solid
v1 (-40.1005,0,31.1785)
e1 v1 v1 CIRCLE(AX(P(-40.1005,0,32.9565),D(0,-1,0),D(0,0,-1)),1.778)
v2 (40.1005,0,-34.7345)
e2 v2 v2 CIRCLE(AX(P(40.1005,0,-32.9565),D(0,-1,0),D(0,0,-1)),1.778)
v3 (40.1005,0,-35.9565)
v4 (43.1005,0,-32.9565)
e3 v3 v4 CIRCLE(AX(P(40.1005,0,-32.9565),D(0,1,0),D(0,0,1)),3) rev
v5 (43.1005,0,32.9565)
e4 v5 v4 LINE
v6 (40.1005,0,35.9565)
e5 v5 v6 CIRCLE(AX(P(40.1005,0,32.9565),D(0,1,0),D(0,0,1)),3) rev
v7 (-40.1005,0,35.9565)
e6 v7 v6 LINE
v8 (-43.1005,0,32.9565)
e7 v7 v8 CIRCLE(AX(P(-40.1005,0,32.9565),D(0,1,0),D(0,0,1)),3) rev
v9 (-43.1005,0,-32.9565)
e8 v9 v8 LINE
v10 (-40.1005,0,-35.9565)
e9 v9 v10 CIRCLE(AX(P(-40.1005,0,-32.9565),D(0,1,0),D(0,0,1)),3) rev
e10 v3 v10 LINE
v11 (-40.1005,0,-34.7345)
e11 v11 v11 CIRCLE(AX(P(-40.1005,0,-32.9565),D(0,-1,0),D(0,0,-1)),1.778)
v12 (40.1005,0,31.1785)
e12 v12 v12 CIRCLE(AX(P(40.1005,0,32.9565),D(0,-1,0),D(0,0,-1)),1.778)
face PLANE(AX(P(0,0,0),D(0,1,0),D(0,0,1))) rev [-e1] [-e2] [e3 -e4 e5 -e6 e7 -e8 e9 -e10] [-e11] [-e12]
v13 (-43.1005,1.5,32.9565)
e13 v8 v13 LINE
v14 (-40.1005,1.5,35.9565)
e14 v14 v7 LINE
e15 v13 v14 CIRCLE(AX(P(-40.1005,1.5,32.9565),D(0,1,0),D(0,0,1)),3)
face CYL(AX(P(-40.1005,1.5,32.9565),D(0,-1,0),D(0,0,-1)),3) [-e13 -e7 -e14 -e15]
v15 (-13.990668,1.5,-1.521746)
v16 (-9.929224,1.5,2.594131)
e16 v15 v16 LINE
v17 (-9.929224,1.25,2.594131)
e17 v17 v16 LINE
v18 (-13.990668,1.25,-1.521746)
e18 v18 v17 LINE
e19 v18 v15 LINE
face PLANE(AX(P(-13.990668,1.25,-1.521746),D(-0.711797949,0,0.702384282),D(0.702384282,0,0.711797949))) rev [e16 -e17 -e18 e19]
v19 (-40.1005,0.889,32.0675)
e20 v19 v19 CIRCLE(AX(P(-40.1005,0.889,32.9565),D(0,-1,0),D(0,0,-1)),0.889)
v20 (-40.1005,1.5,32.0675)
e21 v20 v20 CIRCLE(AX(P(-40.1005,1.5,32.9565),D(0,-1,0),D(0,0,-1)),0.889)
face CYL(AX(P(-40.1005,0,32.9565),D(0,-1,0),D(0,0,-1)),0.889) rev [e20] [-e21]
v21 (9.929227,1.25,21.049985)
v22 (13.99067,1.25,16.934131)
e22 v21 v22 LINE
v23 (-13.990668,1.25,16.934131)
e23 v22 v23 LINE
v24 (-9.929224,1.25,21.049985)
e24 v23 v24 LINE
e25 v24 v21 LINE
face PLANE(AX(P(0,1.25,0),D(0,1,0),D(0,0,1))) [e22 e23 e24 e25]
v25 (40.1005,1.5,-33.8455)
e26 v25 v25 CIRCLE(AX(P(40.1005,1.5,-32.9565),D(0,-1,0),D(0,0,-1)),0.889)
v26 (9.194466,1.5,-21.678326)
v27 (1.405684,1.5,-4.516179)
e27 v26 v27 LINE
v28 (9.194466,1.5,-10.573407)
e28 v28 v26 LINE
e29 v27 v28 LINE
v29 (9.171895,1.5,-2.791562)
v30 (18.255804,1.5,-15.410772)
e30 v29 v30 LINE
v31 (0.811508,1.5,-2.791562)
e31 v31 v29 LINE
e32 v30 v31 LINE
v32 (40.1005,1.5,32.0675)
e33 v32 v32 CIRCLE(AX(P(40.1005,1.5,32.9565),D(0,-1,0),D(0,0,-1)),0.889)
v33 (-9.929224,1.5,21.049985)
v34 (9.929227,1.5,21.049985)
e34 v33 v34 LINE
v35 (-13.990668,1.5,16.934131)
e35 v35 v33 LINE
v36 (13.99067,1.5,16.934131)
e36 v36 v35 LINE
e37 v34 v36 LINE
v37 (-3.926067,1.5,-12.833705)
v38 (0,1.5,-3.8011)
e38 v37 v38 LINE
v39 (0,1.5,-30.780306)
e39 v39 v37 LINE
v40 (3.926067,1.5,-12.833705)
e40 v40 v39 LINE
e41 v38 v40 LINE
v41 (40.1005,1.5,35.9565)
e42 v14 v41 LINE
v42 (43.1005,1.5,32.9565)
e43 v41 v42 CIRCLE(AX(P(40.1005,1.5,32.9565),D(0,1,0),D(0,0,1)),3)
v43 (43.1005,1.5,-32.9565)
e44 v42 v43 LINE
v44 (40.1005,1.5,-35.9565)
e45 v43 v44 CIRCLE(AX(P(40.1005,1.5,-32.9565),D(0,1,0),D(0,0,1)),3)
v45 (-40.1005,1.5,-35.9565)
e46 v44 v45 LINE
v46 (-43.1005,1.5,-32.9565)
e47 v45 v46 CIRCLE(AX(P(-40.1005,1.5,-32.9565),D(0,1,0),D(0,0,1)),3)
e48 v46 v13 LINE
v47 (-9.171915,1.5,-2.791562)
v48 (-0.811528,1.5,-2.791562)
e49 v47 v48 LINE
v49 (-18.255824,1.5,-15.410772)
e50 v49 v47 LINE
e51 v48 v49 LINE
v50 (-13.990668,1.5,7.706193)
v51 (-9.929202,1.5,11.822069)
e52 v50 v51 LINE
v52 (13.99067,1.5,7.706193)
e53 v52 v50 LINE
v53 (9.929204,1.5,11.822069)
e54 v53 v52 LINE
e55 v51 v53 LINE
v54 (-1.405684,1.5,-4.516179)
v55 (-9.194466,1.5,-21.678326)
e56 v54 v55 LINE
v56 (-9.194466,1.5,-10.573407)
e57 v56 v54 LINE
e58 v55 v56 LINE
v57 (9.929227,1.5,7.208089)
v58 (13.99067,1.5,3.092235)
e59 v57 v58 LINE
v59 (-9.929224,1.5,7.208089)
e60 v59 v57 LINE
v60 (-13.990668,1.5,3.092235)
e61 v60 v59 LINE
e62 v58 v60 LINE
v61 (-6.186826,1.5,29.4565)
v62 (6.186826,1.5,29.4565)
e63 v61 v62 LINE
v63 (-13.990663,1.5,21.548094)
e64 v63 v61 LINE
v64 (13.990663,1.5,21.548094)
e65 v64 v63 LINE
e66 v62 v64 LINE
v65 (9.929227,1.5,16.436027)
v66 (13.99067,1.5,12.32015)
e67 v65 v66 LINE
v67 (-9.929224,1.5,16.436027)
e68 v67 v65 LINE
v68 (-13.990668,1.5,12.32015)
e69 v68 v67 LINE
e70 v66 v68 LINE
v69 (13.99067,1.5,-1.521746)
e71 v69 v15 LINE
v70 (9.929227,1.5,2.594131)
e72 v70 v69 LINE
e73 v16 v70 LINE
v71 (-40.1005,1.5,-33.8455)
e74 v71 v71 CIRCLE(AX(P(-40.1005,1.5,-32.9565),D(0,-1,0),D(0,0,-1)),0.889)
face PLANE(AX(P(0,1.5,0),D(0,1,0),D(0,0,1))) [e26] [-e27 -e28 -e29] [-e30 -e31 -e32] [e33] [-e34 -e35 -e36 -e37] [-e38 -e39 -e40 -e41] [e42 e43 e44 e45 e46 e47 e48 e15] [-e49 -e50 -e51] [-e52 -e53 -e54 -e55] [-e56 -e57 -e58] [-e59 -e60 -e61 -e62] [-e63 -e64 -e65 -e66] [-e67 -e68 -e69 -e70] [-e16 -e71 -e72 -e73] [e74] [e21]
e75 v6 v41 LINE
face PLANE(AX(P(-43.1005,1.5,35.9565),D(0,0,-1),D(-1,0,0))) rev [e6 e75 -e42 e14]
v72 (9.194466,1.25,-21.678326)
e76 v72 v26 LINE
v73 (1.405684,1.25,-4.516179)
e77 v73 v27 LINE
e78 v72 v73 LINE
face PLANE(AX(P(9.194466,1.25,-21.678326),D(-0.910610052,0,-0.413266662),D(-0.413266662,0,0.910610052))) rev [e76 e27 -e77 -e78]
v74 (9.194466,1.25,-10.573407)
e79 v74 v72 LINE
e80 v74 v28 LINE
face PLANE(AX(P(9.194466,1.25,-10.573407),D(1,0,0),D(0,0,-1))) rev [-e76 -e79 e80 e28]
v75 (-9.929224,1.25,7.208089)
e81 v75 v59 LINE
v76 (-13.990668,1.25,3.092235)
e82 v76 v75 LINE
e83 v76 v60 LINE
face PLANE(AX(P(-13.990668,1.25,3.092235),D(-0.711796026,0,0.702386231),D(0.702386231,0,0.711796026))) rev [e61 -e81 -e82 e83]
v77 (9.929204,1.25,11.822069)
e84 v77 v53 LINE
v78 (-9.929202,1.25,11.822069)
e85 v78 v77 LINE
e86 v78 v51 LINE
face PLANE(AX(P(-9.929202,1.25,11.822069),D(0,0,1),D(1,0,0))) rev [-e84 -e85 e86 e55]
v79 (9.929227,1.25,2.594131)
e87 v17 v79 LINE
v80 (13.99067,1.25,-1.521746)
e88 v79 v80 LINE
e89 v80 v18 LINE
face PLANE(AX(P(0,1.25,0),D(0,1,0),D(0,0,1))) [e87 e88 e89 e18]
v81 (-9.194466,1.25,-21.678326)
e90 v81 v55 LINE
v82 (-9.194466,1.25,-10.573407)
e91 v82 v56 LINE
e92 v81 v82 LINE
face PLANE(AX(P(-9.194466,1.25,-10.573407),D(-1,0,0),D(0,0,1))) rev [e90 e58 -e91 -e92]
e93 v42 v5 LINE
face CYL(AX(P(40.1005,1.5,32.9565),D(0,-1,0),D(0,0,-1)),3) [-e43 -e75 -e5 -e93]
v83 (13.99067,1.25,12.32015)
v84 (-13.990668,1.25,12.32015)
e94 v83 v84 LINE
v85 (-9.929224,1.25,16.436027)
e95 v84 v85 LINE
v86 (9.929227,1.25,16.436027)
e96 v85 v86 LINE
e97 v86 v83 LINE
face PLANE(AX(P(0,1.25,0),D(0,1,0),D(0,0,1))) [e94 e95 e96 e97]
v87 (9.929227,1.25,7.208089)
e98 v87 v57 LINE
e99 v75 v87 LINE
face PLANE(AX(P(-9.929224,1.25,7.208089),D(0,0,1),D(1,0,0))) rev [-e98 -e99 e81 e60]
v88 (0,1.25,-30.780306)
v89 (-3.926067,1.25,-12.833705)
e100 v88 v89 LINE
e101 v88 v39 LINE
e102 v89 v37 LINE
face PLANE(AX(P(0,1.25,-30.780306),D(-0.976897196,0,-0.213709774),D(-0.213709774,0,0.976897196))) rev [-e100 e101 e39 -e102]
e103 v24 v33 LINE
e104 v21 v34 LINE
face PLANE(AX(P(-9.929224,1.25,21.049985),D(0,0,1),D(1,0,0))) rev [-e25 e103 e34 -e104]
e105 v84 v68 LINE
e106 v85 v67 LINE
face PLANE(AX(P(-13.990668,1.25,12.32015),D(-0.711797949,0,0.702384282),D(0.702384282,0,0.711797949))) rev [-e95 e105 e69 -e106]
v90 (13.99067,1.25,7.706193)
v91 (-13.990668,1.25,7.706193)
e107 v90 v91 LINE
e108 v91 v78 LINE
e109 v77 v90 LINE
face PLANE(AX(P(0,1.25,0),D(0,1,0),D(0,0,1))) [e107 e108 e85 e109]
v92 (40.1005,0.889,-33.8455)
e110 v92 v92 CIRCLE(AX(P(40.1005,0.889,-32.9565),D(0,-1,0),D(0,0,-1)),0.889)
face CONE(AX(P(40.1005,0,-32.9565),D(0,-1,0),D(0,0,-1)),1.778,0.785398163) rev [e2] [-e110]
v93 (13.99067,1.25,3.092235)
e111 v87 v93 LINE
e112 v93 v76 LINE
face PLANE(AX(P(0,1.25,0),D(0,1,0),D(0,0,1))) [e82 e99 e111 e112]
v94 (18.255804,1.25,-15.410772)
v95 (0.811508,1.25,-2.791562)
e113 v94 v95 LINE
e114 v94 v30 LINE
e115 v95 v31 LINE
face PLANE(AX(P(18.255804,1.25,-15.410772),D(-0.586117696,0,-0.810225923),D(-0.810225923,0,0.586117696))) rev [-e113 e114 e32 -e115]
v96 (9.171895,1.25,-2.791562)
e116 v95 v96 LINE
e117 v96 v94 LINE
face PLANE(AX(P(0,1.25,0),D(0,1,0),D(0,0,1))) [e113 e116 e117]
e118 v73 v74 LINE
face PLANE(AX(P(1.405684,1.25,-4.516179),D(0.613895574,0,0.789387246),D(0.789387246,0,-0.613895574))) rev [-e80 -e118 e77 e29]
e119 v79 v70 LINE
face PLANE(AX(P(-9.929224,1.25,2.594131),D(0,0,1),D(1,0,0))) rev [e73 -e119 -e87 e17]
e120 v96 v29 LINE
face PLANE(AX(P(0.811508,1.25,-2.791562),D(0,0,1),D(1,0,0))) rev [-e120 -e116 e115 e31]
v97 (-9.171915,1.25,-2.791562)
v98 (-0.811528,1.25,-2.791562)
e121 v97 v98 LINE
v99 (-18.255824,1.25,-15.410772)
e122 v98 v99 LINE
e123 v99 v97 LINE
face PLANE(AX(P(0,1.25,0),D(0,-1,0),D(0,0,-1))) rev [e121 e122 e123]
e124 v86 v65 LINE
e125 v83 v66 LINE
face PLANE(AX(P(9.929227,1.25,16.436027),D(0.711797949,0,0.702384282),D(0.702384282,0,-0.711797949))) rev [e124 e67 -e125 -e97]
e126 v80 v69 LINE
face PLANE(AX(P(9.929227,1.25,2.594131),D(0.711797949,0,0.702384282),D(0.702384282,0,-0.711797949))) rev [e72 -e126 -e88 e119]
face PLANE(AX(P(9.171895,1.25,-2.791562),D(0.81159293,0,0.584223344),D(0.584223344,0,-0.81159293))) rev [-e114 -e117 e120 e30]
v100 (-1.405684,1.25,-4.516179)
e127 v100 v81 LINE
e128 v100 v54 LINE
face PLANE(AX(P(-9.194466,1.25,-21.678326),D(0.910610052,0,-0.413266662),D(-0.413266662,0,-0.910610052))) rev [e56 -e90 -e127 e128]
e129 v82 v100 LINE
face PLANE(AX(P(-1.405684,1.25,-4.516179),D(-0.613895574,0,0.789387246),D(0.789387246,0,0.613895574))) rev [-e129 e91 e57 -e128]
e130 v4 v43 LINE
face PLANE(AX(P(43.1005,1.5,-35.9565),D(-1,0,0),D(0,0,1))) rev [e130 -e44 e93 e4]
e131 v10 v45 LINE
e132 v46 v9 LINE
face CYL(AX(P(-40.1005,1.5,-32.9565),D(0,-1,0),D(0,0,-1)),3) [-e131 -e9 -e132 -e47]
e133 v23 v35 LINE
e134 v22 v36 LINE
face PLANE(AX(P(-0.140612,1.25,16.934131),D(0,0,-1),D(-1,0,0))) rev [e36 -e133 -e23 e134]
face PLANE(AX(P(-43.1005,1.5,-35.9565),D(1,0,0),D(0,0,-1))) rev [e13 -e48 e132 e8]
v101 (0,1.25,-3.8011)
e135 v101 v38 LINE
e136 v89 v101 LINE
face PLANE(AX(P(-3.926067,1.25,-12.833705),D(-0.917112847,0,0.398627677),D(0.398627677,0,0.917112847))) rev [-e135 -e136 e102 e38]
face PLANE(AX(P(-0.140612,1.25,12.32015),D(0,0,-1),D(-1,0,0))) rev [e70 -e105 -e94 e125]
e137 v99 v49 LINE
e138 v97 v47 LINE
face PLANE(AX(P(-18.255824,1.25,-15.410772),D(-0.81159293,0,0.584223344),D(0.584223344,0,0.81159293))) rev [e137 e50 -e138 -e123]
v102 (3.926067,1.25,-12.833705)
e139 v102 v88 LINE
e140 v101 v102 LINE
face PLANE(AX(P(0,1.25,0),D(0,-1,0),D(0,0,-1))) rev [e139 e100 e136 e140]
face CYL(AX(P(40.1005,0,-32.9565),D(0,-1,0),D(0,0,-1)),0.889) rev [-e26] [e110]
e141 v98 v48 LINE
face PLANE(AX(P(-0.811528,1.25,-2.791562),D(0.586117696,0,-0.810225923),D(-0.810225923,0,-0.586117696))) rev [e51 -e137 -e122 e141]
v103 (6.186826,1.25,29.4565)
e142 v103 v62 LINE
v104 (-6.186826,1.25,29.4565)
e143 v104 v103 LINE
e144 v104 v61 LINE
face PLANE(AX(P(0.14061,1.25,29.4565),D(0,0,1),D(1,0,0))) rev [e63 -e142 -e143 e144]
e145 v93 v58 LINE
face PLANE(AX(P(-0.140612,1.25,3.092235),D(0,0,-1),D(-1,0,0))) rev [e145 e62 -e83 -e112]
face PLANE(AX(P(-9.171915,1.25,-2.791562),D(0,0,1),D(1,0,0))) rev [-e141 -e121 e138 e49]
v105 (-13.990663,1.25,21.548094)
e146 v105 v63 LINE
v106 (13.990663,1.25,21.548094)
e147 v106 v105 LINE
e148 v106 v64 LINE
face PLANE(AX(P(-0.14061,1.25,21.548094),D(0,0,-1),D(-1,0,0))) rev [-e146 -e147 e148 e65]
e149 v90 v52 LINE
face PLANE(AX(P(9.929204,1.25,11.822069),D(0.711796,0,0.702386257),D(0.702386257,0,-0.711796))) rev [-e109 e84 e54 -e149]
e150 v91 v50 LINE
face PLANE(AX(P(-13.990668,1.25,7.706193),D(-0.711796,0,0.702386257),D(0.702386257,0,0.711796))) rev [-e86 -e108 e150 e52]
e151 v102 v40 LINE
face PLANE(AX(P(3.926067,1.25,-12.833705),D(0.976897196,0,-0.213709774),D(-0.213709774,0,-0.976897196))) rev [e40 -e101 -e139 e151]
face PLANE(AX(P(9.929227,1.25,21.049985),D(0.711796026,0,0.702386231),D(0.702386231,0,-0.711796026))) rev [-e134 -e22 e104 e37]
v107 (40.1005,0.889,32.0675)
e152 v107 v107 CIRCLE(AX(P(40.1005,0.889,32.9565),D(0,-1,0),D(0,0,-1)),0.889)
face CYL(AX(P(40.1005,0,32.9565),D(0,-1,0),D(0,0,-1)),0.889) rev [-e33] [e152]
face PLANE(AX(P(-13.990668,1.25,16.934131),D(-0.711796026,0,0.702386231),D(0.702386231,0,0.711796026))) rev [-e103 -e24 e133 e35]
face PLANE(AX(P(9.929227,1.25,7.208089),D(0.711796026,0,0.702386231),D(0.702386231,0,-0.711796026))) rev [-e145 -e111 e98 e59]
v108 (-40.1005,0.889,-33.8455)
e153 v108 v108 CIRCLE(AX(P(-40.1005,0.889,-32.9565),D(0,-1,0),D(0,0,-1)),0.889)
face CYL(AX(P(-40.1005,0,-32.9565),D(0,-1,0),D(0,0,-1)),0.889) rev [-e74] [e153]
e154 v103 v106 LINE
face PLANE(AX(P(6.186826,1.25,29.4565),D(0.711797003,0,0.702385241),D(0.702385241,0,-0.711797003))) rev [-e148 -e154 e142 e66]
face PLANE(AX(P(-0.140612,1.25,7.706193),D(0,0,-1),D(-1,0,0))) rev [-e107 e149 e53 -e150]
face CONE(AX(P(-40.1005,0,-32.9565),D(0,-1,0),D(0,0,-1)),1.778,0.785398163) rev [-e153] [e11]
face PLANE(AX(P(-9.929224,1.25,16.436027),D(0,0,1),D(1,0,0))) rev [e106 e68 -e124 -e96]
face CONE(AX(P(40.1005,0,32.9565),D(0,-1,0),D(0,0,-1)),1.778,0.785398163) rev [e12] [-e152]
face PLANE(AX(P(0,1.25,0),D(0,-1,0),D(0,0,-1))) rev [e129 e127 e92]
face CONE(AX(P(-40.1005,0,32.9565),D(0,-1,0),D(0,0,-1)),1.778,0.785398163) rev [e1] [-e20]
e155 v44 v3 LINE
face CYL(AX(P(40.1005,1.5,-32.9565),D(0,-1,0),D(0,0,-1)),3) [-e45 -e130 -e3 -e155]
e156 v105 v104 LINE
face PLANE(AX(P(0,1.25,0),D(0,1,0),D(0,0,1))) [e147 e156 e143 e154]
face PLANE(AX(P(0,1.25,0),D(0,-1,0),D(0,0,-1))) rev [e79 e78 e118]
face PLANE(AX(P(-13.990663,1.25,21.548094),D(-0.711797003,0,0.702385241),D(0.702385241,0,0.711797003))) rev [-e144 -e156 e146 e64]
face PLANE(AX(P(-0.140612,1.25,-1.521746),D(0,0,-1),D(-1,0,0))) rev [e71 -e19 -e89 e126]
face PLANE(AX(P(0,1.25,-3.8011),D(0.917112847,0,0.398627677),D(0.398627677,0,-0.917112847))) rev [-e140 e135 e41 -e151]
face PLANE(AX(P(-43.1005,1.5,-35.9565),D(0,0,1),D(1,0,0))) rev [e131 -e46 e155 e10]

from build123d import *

# Parameters (mm, degrees)
SKETCH1_W                      = 86.201
SKETCH1_H                      = 71.913
BOSS_EXTRUDE1_DEPTH            = 1.5
FILLET1_R                      = 3
F_2_56_TAPPED_HOLE1_AT_2_COUNT = 2
F_2_56_TAPPED_HOLE1_AT_2_PITCH = 80.201
F_2_56_TAPPED_HOLE1_AT_3_COUNT = 2
F_2_56_TAPPED_HOLE1_AT_3_PITCH = 103.811001199
F_2_56_TAPPED_HOLE1_AT_4_COUNT = 2
F_2_56_TAPPED_HOLE1_AT_4_PITCH = 65.913
CUT_EXTRUDE1_START             = -0.25
CUT_EXTRUDE1_DEPTH             = 0.25


# Read off the part's stored shape, not the designer's step: Cut-Extrude1
with BuildPart() as part:
    # Sketch1 → Boss-Extrude1 (new body)
    with BuildSketch(Plane(origin=(0, 0, 0), x_dir=(1, 0, 0), z_dir=(0, 1, 0))):
        Rectangle(SKETCH1_W, SKETCH1_H)
    extrude(amount=BOSS_EXTRUDE1_DEPTH)

    # Fillet1
    fillet1_edges = [part.edges().sort_by_distance(p)[0] for p in [
        (43.1005, 0.75, 35.9565),
        (-43.1005, 0.75, 35.9565),
        (-43.1005, 0.75, -35.9565),
        (43.1005, 0.75, -35.9565),
    ]]
    fillet(fillet1_edges, radius=FILLET1_R)

    # Sketch4 → #2-56 Tapped Hole1 (revolve, cut)
    with BuildSketch(Plane(origin=(-40.1005, 0, 32.9565), x_dir=(0, 0, -1), z_dir=(1, 0, 0))):
        Polygon((0, 0), (0, 1.5), (0.889, 1.5), (0.889, 0.889), (1.778, 0), align=None)
    f_2_56_tapped_hole1 = revolve(axis=Axis((-40.1005, -6.35, 32.9565), (0, 1, 0)), mode=Mode.SUBTRACT)

    # #2-56 Tapped Hole1 at 2: #2-56 Tapped Hole1 ×2
    with Locations(*[(i * F_2_56_TAPPED_HOLE1_AT_2_PITCH, 0, 0) for i in range(1, F_2_56_TAPPED_HOLE1_AT_2_COUNT)]):
        add(f_2_56_tapped_hole1, mode=Mode.SUBTRACT)

    # #2-56 Tapped Hole1 at 3: #2-56 Tapped Hole1 ×2
    with Locations(*[Vector(0.7725674453907951, 0, -0.634932706924396) * (i * F_2_56_TAPPED_HOLE1_AT_3_PITCH) for i in range(1, F_2_56_TAPPED_HOLE1_AT_3_COUNT)]):
        add(f_2_56_tapped_hole1, mode=Mode.SUBTRACT)

    # #2-56 Tapped Hole1 at 4: #2-56 Tapped Hole1 ×2
    with Locations(*[(0, 0, -i * F_2_56_TAPPED_HOLE1_AT_4_PITCH) for i in range(1, F_2_56_TAPPED_HOLE1_AT_4_COUNT)]):
        add(f_2_56_tapped_hole1, mode=Mode.SUBTRACT)

    # Cut-Extrude1 outline → Cut-Extrude1 (cut)
    with BuildSketch(Plane(origin=(0, 1.5, 0), x_dir=(1, 0, 0), z_dir=(0, 1, 0)).offset(CUT_EXTRUDE1_START)):
        Polygon((-13.990667708, -16.934130724), (-9.929224496, -21.049984667), (9.929227007, -21.049984667), (13.990670219, -16.934130724), align=None)
        Polygon((-18.255824334, 15.410771968), (-9.171914583, 2.791562203), (-0.811527801, 2.791562203), align=None)
        Polygon((18.255804305, 15.410771968), (0.811507772, 2.791562203), (9.171894554, 2.791562203), align=None)
        Polygon((-9.194466068, 10.573407227), (-1.405683839, 4.516178709), (-9.194466068, 21.678326178), align=None)
        Polygon((-13.990667708, -12.320150377), (-9.929224496, -16.436026859), (9.929227007, -16.436026859), (13.990670219, -12.320150377), align=None)
        Polygon((-13.990667708, -7.70619257), (-9.929201956, -11.822069052), (9.929204467, -11.822069052), (13.990670219, -7.70619257), align=None)
        Polygon((-13.990667708, -3.092234762), (-9.929224496, -7.208088705), (9.929227007, -7.208088705), (13.990670219, -3.092234762), align=None)
        Polygon((-13.990667708, 1.521745585), (-9.929224496, -2.594130897), (9.929227007, -2.594130897), (13.990670219, 1.521745585), align=None)
        Polygon((0, 3.801099501), (3.926067099, 12.833705067), (0, 30.78030555), (-3.926067099, 12.833705067), align=None)
        Polygon((1.405683839, 4.516178709), (9.194466068, 10.573407227), (9.194466068, 21.678326178), align=None)
        Polygon((-6.186825635, -29.4565), (6.186825635, -29.4565), (13.990662514, -21.548093926), (-13.990662514, -21.548093926), align=None)
    extrude(amount=CUT_EXTRUDE1_DEPTH, mode=Mode.SUBTRACT)


solid = part.part
